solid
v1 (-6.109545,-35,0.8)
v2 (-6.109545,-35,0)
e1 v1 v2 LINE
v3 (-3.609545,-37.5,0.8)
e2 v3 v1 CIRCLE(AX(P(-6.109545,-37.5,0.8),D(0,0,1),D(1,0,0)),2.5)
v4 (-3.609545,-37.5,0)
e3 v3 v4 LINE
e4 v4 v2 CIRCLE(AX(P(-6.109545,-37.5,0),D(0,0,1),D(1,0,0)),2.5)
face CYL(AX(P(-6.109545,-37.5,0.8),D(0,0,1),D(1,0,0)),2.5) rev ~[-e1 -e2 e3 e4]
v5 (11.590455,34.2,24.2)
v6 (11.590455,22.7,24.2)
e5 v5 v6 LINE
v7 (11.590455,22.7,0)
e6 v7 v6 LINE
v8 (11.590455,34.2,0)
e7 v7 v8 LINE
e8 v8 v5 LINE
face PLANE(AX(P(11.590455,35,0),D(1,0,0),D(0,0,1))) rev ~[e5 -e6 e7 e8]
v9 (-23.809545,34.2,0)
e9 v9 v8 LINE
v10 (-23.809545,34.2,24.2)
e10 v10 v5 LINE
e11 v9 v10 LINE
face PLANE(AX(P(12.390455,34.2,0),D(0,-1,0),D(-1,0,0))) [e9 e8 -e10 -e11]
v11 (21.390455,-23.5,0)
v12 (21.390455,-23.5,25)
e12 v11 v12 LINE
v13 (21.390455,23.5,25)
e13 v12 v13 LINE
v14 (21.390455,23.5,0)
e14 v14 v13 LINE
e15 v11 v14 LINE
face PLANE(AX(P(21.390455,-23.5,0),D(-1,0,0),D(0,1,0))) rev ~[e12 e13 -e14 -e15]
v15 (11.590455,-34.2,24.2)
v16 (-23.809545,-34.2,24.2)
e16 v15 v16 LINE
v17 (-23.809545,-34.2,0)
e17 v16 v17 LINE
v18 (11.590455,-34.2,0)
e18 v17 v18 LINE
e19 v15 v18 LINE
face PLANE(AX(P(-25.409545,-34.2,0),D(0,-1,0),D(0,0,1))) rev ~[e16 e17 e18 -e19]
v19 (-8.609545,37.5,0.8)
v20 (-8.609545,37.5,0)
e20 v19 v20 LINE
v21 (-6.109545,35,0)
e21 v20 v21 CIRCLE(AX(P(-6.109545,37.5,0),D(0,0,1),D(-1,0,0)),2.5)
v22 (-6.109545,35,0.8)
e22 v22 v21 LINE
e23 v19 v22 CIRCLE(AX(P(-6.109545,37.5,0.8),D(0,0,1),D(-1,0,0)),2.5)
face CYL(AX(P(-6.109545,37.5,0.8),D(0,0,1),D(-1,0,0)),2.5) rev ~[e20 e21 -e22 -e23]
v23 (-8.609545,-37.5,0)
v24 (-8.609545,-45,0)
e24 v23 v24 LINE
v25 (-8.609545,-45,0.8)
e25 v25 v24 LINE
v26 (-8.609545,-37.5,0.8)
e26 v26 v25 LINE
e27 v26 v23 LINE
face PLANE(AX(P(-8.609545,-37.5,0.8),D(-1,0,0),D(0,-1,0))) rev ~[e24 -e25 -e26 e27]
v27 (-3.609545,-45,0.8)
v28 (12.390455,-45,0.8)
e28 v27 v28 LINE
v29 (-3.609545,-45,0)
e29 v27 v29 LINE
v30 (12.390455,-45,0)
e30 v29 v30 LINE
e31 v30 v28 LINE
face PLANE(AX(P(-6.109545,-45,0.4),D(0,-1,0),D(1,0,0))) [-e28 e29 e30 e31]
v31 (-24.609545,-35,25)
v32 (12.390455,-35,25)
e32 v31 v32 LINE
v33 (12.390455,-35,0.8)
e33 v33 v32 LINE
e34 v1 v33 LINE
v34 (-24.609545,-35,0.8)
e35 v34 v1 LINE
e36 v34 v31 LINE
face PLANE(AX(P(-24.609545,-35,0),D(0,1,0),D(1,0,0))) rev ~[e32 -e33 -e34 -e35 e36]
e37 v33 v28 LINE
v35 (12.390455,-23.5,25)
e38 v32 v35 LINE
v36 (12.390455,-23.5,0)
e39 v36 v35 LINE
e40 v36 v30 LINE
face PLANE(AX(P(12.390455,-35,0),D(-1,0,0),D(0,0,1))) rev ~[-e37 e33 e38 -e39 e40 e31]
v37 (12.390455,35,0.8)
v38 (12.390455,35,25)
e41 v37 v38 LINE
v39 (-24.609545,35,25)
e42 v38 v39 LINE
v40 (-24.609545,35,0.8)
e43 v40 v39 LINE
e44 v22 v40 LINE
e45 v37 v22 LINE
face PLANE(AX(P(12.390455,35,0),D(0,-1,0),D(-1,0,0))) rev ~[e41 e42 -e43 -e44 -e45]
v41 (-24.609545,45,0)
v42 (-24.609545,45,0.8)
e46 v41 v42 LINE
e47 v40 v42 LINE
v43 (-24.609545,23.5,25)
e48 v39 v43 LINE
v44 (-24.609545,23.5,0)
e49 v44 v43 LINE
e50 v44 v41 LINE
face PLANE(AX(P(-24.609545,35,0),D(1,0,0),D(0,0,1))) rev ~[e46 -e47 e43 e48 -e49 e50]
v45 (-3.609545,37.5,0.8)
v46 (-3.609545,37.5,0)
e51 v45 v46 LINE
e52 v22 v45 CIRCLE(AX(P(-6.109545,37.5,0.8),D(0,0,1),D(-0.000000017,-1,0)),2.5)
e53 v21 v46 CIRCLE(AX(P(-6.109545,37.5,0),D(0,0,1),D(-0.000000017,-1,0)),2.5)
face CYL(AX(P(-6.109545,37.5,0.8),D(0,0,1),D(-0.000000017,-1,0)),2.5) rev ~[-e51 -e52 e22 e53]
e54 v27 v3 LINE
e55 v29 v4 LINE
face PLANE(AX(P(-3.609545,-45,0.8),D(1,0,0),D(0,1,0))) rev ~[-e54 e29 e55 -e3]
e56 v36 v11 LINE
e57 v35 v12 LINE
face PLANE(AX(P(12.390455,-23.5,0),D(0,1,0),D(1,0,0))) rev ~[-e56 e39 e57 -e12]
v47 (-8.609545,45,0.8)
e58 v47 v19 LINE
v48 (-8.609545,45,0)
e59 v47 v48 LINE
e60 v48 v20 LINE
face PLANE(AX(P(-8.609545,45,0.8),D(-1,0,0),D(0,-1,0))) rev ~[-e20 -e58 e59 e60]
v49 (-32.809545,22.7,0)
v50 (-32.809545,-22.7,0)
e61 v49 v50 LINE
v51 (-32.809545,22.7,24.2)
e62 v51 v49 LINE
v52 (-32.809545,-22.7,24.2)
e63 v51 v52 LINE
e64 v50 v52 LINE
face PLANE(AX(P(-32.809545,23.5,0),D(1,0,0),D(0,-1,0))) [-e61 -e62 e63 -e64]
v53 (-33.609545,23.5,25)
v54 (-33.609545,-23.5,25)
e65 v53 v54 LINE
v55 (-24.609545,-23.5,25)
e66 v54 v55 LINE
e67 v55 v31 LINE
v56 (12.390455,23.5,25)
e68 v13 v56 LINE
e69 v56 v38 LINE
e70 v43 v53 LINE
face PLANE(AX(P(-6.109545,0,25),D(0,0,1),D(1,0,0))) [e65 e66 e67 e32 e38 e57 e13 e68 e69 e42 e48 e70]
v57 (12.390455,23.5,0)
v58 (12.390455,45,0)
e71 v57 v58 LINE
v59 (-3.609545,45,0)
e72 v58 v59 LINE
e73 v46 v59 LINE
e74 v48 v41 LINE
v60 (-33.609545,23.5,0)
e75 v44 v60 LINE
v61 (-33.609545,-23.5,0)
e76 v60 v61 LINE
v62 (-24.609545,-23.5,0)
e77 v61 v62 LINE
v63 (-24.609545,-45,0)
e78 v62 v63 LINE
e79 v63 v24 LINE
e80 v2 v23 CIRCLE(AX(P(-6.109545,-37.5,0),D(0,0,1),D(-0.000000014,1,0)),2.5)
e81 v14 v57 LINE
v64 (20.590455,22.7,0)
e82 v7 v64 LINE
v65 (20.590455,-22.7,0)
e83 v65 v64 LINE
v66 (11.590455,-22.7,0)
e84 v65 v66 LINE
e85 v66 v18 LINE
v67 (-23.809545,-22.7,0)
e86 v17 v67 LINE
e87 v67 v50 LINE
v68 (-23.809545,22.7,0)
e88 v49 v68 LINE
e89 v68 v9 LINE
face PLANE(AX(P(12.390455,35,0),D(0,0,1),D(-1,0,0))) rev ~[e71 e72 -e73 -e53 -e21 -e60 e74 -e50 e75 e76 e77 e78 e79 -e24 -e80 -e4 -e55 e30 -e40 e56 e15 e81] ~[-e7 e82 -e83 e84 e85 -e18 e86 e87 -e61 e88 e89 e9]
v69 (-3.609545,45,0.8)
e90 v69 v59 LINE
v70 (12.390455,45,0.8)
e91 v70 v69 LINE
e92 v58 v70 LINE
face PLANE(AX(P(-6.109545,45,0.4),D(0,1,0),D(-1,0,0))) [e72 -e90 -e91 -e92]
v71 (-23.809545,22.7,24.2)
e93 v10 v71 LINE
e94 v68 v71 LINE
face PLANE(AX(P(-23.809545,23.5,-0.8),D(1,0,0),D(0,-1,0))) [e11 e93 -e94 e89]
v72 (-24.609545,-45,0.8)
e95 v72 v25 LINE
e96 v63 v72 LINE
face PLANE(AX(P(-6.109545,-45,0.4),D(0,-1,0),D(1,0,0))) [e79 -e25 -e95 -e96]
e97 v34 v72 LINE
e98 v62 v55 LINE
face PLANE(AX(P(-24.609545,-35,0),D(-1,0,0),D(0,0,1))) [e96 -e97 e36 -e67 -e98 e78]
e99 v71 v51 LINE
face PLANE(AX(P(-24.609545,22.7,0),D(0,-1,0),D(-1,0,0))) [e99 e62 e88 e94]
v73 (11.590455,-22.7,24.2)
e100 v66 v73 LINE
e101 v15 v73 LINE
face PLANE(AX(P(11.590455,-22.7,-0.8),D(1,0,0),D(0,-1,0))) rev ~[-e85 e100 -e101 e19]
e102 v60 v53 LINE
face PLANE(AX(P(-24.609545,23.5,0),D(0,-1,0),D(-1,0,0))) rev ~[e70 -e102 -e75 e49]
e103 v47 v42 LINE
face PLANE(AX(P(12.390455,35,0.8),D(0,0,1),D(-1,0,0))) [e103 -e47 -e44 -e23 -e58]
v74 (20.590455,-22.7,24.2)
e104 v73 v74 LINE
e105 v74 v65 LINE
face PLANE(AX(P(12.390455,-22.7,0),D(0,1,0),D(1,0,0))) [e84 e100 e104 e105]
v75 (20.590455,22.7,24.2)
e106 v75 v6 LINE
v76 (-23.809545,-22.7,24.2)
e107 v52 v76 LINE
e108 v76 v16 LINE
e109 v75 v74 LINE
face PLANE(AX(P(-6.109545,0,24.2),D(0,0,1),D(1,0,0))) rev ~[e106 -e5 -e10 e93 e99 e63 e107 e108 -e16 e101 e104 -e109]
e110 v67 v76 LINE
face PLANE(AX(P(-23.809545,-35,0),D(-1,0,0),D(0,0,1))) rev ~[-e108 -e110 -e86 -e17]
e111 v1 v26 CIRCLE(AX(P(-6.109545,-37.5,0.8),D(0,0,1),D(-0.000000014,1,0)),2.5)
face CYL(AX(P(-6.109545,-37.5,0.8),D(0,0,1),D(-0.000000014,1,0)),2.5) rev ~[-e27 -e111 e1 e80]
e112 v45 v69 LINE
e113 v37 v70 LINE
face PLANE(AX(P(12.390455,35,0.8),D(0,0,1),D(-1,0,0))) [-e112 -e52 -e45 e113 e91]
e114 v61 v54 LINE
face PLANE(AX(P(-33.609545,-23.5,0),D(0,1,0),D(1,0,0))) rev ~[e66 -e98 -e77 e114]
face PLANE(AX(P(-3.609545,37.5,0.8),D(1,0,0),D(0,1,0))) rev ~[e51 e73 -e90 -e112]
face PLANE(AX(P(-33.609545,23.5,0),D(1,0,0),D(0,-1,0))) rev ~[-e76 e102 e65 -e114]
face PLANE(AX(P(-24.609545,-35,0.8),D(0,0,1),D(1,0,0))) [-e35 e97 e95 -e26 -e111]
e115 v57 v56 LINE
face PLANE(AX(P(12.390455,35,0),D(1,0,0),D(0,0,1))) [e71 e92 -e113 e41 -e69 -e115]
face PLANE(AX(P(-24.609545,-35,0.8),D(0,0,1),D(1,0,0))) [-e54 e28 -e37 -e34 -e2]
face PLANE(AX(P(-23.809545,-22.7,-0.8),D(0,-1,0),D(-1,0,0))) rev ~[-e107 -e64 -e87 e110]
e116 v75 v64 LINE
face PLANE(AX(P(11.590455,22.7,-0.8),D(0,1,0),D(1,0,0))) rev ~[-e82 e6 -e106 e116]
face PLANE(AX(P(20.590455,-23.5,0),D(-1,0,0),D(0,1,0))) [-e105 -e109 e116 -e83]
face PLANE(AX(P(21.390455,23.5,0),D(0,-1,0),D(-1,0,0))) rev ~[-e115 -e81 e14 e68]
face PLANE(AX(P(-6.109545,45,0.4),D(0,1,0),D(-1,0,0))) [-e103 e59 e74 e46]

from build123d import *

# Parameters (mm, degrees)
F1_DEPTH    = 25
F2_W        = 37
F2_H        = 0.8
F3_DEPTH    = 10
F4_W        = 37
F4_H        = 0.8
F5_DEPTH    = 10
F6_T        = 0.8
F6_T3_DEPTH = 26.6
F6_T5_DEPTH = 38.6
F9_DEPTH    = 2


# Not quite as in the source:
# - a shell that OpenCascade refuses in one call is made with other operations: the cavity is built on its own and cut out


with BuildPart() as f1:
    # F0 (on Top) → F1 (new body)
    with BuildSketch(Plane.XY):
        Polygon((-33.6095448622, 23.5), (-33.6095448622, -23.5), (-24.6095448622, -23.5), (-24.6095448622, -35), (12.3904551378, -35), (12.3904551378, -23.5), (21.3904551378, -23.5), (21.3904551378, 23.5), (12.3904551378, 23.5), (12.3904551378, 35), (-24.6095448622, 35), (-24.6095448622, 23.5), align=None)
    extrude(amount=F1_DEPTH)

    # F2 (on face) → F3 (join)
    with BuildSketch(Plane.XZ.offset(35)):
        with Locations((-6.1095448622, 0.4)):
            Rectangle(F2_W, F2_H)
    extrude(amount=F3_DEPTH)

    # F4 (on face) → F5 (join)
    with BuildSketch(Plane(origin=(0, 35, 0), x_dir=(-1, 0, 0), z_dir=(0, 1, 0))):
        with Locations((6.1095448622, 0.4)):
            Rectangle(F4_W, F4_H)
    extrude(amount=F5_DEPTH)

    # F6: shell of thickness 0.8, made by hand


with BuildPart() as f6_core1:
    # F6_t2: copy of F1
    add(f1.part)

    # the walls: a layer under each face that stays
    f6_faces = [f6_core1.faces().sort_by_distance(p)[0] for p in [
        (-33.6095448622, 0, 12.5),
        (-6.1095448622, 0, 25),
        (-24.6095448622, 34.25, 12.5),
        (-6.1095448622, 40, 0.8),
        (-6.1095448622, 45, 0.4),
        (-6.1095448622, 35, 12.9),
        (12.3904551378, 34.25, 12.5),
        (16.8904551378, 23.5, 12.5),
        (21.3904551378, 0, 12.5),
        (16.8904551378, -23.5, 12.5),
        (12.3904551378, -34.25, 12.5),
        (-6.1095448622, -40, 0.8),
        (-6.1095448622, -45, 0.4),
        (-6.1095448622, -35, 12.9),
        (-24.6095448622, -34.25, 12.5),
        (-29.1095448622, -23.5, 12.5),
        (-29.1095448622, 23.5, 12.5),
    ]]
    thicken(f6_faces, amount=-F6_T, mode=Mode.SUBTRACT)

    # F6_s4 → F6_t3 (cut)
    with BuildSketch(Plane.XY.offset(-0.8)):
        Polygon((-24.6175448622, 23.508), (-23.8095448622, 23.5), (-23.8095448622, 22.7), (-24.6095448622, 22.7), align=None)
        Polygon((12.3984551378, 23.508), (11.5904551378, 23.5), (11.5904551378, 22.7), (12.3904551378, 22.7), align=None)
        Polygon((12.3984551378, -23.508), (12.3904551378, -22.7), (11.5904551378, -22.7), (11.5904551378, -23.5), align=None)
        Polygon((-24.6175448622, -23.508), (-23.8095448622, -23.5), (-23.8095448622, -22.7), (-24.6095448622, -22.7), align=None)
    extrude(amount=F6_T3_DEPTH, mode=Mode.SUBTRACT)

    # F6_s6 → F6_t5 (cut)
    with BuildSketch(Plane.YZ.offset(-25.4095448622)):
        Polygon((35.008, 0.808), (35, 0), (34.2, 0), (34.2, 0.8), align=None)
        Polygon((-35.008, 0.808), (-35, 0), (-34.2, 0), (-34.2, 0.8), align=None)
    extrude(amount=F6_T5_DEPTH, mode=Mode.SUBTRACT)


with BuildPart() as f1_1:
    add(f1.part)

    # what is left inside the walls is the cavity
    f6_cavity = [f6_core1.part.solids().sort_by_distance(p)[0] for p in [
        (-6.109545, -11.4, 24.192),
    ]]
    add(f6_cavity, mode=Mode.SUBTRACT)

    # F8 (on face) + F7 (on face) → F9 (cut)
    with BuildSketch(Plane.XY.offset(0.8)):
        with BuildLine():
            Line((-8.6095448622, -37.5000002948), (-8.6095448622, -45))
            Line((-8.6095448622, -45), (-3.6095448622, -45))
            Line((-3.6095448622, -45), (-3.6095448622, -37.5))
            ThreePointArc((-3.6095448622, -37.5), (-4.3417779216, -35.7322330347), (-6.1095448972, -35))
            ThreePointArc((-6.1095448972, -35), (-7.8773119318, -35.7322331636), (-8.6095448622, -37.5000002948))
        make_face()
    with BuildSketch(Plane.XY.offset(0.8)):
        with BuildLine():
            Line((-3.6095448622, 37.5), (-3.6095448622, 45))
            Line((-3.6095448622, 45), (-8.6095448622, 45))
            Line((-8.6095448622, 45), (-8.6095448622, 37.5))
            ThreePointArc((-8.6095448622, 37.5), (-7.8773118305, 35.7322330623), (-6.1095449054, 35))
            ThreePointArc((-6.1095449054, 35), (-4.3417779245, 35.7322330318), (-3.6095448622, 37.5))
        make_face()
    extrude(amount=-F9_DEPTH, mode=Mode.SUBTRACT)


solid = f1_1.part
